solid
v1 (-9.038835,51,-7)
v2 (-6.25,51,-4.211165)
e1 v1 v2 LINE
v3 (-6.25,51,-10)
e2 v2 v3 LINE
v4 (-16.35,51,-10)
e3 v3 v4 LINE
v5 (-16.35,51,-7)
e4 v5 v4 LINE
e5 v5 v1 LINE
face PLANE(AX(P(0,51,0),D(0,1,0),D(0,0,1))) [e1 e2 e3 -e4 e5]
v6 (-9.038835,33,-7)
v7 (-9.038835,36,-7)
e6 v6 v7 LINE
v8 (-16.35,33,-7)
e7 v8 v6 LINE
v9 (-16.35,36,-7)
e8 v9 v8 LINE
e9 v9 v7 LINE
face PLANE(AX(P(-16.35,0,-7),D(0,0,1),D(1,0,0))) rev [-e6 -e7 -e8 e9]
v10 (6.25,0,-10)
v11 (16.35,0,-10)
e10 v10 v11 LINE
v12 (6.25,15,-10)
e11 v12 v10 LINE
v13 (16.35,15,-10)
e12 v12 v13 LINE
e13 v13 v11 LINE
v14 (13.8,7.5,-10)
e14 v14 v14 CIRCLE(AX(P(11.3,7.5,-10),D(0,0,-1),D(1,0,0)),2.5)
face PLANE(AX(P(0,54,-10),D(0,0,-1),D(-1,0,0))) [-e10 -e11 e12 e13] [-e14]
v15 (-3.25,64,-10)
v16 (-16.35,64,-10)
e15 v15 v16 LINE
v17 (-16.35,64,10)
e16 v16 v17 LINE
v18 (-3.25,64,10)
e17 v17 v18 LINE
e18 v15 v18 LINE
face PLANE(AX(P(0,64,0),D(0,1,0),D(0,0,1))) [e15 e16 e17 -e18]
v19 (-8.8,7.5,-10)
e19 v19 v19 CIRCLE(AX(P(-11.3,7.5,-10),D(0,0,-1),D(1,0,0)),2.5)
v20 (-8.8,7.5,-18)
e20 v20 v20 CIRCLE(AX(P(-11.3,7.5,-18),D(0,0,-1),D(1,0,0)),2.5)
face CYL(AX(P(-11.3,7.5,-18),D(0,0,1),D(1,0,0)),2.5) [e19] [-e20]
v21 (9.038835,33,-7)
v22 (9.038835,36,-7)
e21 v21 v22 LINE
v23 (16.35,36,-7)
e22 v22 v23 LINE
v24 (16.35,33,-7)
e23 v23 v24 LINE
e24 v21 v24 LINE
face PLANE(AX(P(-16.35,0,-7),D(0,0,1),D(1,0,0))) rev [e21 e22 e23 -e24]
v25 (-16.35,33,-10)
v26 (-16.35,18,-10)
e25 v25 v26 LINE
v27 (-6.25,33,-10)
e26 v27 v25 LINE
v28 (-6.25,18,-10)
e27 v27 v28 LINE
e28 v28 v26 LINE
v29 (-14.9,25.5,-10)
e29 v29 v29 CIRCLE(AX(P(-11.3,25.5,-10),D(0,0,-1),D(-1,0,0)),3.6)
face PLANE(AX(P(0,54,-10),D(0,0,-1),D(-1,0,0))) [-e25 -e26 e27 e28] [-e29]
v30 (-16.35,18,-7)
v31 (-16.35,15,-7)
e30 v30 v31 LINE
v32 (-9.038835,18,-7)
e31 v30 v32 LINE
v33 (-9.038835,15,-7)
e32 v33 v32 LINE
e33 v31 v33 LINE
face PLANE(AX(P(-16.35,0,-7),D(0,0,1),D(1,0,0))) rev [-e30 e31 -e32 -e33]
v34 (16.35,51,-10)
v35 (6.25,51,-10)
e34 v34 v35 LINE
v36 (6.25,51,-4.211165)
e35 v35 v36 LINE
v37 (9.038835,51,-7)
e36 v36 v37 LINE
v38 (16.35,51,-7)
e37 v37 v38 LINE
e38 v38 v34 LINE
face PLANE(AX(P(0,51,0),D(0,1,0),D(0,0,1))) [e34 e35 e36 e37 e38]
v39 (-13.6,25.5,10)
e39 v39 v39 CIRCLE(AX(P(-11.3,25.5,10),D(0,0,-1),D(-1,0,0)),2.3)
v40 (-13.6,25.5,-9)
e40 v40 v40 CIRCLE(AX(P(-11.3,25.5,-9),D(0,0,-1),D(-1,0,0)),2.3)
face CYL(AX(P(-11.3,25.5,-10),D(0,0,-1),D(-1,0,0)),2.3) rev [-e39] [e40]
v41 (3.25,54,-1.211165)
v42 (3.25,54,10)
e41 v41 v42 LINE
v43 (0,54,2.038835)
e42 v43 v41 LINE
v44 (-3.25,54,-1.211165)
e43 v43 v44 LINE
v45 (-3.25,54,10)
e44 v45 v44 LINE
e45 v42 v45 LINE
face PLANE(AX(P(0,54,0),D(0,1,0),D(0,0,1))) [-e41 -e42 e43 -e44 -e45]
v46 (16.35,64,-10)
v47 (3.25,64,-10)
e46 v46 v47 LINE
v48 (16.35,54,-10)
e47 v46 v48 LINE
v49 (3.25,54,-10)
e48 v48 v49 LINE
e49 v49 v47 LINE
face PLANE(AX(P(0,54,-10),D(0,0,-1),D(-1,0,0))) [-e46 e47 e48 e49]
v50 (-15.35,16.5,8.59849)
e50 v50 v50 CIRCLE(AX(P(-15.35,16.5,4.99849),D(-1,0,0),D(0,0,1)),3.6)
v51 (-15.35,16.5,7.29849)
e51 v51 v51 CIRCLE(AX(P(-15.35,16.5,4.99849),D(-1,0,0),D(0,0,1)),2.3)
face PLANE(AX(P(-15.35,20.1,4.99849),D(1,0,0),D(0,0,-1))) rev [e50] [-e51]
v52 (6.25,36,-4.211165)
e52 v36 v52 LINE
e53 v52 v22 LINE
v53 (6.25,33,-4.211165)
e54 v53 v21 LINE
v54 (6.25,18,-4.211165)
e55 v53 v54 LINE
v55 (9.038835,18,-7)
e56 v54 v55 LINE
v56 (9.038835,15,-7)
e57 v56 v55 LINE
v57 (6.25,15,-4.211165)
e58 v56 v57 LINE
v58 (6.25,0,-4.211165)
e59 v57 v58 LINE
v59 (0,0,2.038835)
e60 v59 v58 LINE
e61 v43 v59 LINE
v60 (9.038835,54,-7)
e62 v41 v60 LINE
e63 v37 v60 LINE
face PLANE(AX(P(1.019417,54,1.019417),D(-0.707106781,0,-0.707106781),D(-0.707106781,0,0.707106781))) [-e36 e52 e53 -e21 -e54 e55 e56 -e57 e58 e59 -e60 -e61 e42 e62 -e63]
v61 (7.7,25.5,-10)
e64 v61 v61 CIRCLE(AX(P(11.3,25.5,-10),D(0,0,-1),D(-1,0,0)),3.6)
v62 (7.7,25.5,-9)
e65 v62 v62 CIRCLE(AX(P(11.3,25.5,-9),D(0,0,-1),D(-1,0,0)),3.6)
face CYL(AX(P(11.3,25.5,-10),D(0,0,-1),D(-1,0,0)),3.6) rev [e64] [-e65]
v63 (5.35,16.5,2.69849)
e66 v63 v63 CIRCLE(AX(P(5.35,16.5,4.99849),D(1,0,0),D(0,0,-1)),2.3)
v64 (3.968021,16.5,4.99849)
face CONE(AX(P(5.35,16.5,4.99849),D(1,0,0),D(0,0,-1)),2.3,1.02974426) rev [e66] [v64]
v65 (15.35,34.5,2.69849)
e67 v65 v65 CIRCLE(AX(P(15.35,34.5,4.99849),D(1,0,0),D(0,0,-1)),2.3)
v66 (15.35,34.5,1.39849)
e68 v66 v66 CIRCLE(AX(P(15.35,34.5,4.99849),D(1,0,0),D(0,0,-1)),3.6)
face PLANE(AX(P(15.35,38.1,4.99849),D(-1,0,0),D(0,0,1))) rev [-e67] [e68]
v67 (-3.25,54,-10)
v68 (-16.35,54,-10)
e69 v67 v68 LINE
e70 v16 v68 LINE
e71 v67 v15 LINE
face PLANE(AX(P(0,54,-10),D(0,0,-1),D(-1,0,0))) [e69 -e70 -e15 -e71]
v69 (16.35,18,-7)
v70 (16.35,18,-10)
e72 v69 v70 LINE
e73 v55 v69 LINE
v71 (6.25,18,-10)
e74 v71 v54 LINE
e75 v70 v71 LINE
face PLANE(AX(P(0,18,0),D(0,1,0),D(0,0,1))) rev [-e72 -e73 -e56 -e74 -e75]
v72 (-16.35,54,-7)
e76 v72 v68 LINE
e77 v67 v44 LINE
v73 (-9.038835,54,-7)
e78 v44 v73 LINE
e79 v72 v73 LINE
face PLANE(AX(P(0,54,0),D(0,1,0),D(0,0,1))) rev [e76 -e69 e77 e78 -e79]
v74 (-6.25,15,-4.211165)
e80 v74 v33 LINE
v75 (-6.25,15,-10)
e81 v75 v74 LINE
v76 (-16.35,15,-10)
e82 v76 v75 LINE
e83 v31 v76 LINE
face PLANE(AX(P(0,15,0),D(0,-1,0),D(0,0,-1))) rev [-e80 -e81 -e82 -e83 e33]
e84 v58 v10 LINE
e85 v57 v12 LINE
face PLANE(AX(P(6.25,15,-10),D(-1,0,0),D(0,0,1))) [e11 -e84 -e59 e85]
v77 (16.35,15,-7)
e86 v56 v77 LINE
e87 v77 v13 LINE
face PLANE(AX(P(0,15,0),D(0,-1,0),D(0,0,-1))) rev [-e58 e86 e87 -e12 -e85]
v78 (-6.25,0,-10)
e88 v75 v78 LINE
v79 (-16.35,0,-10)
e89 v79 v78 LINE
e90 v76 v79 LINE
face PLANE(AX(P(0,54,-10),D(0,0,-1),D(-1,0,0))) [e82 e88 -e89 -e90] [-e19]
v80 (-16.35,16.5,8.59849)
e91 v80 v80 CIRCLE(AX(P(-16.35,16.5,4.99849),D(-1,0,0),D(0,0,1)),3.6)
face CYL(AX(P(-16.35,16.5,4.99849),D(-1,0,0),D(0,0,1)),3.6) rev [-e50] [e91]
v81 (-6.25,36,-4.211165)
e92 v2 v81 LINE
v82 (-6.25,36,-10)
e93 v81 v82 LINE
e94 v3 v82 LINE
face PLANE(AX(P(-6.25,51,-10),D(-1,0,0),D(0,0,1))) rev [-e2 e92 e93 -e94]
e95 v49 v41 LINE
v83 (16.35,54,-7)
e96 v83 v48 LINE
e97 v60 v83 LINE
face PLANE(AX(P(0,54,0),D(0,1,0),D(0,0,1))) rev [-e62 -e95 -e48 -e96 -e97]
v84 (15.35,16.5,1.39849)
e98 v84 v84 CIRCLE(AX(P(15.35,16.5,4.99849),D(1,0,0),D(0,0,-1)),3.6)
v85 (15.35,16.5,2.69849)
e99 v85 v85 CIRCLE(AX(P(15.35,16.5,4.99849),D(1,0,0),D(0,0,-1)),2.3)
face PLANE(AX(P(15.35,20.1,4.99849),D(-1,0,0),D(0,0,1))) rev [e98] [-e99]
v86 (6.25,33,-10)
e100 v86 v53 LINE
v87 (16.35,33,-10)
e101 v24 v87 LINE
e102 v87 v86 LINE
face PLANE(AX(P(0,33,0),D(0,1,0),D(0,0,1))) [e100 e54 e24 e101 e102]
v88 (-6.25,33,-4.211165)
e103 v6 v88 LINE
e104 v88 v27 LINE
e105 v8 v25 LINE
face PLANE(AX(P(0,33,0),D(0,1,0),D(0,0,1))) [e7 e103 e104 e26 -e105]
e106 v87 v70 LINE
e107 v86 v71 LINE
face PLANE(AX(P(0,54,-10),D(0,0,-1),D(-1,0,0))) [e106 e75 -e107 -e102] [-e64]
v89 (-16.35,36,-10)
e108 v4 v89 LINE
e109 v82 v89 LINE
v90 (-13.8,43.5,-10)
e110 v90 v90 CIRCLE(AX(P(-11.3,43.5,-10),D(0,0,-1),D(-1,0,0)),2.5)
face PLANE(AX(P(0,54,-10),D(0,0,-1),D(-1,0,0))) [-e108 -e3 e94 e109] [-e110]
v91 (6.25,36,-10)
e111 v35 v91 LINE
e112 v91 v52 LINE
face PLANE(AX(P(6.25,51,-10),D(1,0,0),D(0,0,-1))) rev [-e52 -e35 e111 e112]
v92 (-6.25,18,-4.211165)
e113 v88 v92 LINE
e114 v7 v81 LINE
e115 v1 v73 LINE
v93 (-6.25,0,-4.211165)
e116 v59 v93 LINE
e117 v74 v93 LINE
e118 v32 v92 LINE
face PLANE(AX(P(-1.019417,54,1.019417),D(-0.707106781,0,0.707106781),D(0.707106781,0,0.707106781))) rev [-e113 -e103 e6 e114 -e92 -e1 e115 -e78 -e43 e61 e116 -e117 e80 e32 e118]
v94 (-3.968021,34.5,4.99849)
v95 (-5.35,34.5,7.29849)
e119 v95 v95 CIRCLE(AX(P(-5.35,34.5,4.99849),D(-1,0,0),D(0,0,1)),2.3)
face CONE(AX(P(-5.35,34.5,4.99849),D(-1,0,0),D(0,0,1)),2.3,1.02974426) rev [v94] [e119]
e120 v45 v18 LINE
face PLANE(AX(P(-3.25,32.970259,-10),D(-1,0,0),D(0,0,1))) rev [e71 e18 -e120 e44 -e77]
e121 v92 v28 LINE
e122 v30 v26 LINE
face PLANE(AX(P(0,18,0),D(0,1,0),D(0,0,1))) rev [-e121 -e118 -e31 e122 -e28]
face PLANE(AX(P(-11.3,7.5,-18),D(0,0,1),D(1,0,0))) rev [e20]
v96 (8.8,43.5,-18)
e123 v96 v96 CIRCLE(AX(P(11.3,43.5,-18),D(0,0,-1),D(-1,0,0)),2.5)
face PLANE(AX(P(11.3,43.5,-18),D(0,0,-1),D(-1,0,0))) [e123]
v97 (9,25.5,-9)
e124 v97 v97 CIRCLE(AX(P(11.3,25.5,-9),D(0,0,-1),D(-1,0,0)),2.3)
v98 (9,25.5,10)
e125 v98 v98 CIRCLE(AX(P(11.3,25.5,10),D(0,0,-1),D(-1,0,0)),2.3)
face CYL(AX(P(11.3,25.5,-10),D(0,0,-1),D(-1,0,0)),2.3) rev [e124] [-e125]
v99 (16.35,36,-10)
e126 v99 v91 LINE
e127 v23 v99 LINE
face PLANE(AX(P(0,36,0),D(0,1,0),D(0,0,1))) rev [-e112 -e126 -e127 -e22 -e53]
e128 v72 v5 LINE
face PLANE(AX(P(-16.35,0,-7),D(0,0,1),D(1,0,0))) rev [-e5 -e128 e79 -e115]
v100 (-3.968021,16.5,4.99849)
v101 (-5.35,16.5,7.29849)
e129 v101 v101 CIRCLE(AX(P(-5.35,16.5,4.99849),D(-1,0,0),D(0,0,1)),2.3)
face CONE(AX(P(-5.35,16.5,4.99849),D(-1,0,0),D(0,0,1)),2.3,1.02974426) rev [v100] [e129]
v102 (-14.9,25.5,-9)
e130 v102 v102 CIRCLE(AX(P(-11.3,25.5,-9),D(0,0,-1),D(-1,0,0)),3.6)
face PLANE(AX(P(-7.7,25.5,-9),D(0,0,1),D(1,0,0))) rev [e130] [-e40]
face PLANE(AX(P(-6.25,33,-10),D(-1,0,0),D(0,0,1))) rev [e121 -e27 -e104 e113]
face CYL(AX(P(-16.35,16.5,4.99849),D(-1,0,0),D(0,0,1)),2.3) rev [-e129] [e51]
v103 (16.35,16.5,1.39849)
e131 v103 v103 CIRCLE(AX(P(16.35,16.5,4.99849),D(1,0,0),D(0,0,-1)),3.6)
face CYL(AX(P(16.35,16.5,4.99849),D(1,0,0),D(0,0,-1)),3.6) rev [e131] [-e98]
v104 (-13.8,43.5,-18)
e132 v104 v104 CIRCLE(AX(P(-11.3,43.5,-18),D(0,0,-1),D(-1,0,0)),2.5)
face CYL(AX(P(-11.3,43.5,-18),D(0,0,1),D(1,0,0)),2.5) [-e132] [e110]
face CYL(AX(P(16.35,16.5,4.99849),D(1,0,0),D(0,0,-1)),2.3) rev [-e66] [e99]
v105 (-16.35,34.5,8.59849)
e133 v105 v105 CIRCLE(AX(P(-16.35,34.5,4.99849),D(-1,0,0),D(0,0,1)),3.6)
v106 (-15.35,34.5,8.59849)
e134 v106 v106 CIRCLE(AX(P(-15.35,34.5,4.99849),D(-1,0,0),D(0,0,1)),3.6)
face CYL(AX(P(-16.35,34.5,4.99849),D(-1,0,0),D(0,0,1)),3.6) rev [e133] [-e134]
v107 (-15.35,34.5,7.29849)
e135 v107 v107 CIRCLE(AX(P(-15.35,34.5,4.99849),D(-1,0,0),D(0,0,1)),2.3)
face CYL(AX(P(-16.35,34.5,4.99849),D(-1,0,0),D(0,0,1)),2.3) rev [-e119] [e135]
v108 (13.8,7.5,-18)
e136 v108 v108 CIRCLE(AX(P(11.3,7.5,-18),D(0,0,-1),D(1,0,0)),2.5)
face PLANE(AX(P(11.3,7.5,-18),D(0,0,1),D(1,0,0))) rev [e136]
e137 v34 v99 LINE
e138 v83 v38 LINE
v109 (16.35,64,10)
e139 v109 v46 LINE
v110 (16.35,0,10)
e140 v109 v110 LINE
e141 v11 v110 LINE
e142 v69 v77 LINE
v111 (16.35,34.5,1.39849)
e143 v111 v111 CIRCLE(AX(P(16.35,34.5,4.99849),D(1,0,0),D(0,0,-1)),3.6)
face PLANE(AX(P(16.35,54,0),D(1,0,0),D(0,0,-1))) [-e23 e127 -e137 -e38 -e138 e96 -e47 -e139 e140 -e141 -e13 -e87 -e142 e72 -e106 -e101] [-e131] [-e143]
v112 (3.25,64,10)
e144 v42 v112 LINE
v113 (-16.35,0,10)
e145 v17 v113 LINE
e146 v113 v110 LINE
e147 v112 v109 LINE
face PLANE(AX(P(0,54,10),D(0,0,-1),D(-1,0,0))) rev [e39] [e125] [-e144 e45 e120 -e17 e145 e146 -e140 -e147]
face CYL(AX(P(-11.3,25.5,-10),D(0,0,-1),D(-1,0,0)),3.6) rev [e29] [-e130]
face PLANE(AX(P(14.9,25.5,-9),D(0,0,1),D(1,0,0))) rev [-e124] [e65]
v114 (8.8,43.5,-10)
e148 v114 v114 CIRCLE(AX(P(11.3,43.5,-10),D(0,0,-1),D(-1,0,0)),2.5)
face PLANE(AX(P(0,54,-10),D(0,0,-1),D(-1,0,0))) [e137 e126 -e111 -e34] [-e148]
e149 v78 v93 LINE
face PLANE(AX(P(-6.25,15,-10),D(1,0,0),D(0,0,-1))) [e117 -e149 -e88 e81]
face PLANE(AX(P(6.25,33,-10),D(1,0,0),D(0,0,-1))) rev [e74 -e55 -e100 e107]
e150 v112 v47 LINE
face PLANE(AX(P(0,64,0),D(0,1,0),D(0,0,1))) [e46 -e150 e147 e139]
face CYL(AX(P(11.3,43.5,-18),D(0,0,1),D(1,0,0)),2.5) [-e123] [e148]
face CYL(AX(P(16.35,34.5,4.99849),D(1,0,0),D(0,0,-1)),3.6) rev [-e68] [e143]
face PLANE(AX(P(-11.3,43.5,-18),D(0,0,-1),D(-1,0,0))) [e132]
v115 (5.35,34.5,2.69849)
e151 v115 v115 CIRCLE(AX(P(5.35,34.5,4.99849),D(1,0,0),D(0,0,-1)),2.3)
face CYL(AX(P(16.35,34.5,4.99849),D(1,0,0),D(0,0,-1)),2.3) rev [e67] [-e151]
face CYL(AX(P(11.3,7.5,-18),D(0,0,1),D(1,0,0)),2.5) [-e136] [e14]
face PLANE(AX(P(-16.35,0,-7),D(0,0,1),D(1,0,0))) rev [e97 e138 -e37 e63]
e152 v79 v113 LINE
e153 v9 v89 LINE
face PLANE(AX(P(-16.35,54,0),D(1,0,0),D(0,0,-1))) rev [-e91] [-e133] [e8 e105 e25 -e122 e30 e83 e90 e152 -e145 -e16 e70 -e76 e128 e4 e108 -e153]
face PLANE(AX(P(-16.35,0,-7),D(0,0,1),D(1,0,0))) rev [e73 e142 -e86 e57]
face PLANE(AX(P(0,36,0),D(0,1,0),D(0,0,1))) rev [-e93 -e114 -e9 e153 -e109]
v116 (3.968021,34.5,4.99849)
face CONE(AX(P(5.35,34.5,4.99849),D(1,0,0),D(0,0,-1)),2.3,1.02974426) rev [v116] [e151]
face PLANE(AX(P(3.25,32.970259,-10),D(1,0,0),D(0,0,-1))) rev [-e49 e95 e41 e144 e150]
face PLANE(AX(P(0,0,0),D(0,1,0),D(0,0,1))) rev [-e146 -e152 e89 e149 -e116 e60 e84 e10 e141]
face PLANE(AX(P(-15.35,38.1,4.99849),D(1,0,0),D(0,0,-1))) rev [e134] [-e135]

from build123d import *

# Parameters (mm, degrees)
EXTRUDE_1_DEPTH        = 54
EXTRUDE_2_DEPTH        = 10
SKETCH_3_W             = 6.5
SKETCH_3_H             = 20
CUT_EXTRUDE_1_DEPTH    = 10
EXTRUDE_3_DEPTH        = 15
EXTRUDE_4_DEPTH        = 15
PATTERN_LINEAR_6_COUNT = 2
PATTERN_LINEAR_6_PITCH = 18
SKETCH_8_W             = 3
SKETCH_8_H             = 3
CUT_EXTRUDE_2_DEPTH    = 73.562318045
SKETCH_9_R             = 2.5
EXTRUDE_5_DEPTH        = 8
OTHER_START            = -10
OTHER_1_OUTLINE_R      = 2.3
OTHER_1_DEPTH          = 20
OTHER_1_2_OUTLINE_R    = 3.6
OTHER_1_2_OUTLINE_R_2  = 2.3
OTHER_1_2_DEPTH        = 1


# Read off the part's stored shape, not the designer's step: 高级异型孔1, 高级异型孔2
with BuildPart() as part:
    # 草图1 → 凸台-拉伸1 (new body)
    with BuildSketch(Plane(origin=(0, 0, 0), x_dir=(1, 0, 0), z_dir=(0, 1, 0))):
        Polygon((-12.038834765, 10), (-16.35, 10), (-16.35, -10), (16.35, -10), (16.35, 10), (12.038834765, 10), (0, -2.038834765), align=None)
    extrude(amount=EXTRUDE_1_DEPTH)

    # 草图2 → 凸台-拉伸2 (add)
    with BuildSketch(Plane(origin=(0, 54, 0), x_dir=(1, 0, 0), z_dir=(0, 1, 0))):
        Polygon((16.35, 10), (12.038834765, 10), (0, -2.038834765), (-12.038834765, 10), (-16.35, 10), (-16.35, -10), (16.35, -10), align=None)
        Polygon((12.038834765, 10), (-12.038834765, 10), (0, -2.038834765), align=None)
    extrude(amount=EXTRUDE_2_DEPTH)

    # 草图3 → 切除-拉伸1 (cut)
    with BuildSketch(Plane(origin=(0, 64, 0), x_dir=(1, 0, 0), z_dir=(0, 1, 0))):
        Rectangle(SKETCH_3_W, SKETCH_3_H)
    extrude(amount=-CUT_EXTRUDE_1_DEPTH, mode=Mode.SUBTRACT)

    # 草图5 → 凸台-拉伸3 (add)
    with BuildSketch(Plane(origin=(0, 0, 0), x_dir=(-1, 0, 0), z_dir=(0, -1, 0))):
        Polygon((6.25, 4.211165235), (12.038834765, 10), (6.25, 10), align=None)
        Polygon((-6.25, 4.211165235), (-12.038834765, 10), (-6.25, 10), align=None)
    extrude(amount=-EXTRUDE_3_DEPTH)

    # 草图6 → 凸台-拉伸4 (add)
    with BuildSketch(Plane(origin=(0, 18, 0), x_dir=(1, 0, 0), z_dir=(0, 1, 0))):
        Polygon((12.038834765, 10), (6.25, 10), (6.25, 4.211165235), align=None)
        Polygon((-6.25, 4.211165235), (-12.038834765, 10), (-6.25, 10), align=None)
    extrude_4 = extrude(amount=EXTRUDE_4_DEPTH)

    # 阵列(线性)6: 凸台-拉伸4 ×2
    with Locations(*[(0, i * PATTERN_LINEAR_6_PITCH, 0) for i in range(1, PATTERN_LINEAR_6_COUNT)]):
        add(extrude_4)

    # 草图8 → 切除-拉伸2 (cut, through all)
    with BuildSketch(Plane(origin=(16.35, 0, 0), x_dir=(0, 0, -1), z_dir=(1, 0, 0))):
        with Locations((8.5, 52.5)):
            Rectangle(SKETCH_8_W, SKETCH_8_H)
        with Locations((8.5, 34.5)):
            Rectangle(SKETCH_8_W, SKETCH_8_H)
        with Locations((8.5, 16.5)):
            Rectangle(SKETCH_8_W, SKETCH_8_H)
    extrude(amount=-CUT_EXTRUDE_2_DEPTH, mode=Mode.SUBTRACT)

    # 草图9 → 凸台-拉伸5 (add)
    with BuildSketch(Plane(origin=(0, 0, -10), x_dir=(-1, 0, 0), z_dir=(0, 0, -1))):
        with Locations((-11.3, 43.5)):
            Circle(SKETCH_9_R)
        with Locations((11.3, 43.5)):
            Circle(SKETCH_9_R)
        with Locations(Location((11.3, 7.5, 0), (0, 0, 180))):
            Circle(SKETCH_9_R)
        with Locations(Location((-11.3, 7.5, 0), (0, 0, 180))):
            Circle(SKETCH_9_R)
    extrude(amount=EXTRUDE_5_DEPTH)

    # 高级异型孔1 outline → 高级异型孔1 (cut)
    with BuildSketch(Plane.XY.offset(OTHER_START)):
        with Locations((-11.3, 25.5)):
            Circle(OTHER_1_OUTLINE_R)
        with Locations((11.3, 25.5)):
            Circle(OTHER_1_OUTLINE_R)
    extrude(amount=OTHER_1_DEPTH, mode=Mode.SUBTRACT)

    # Other 1 2 outline → Other 1 2 (cut)
    # profile 1 of 2: a face of its own
    with BuildSketch(Plane.XY.offset(OTHER_START)):
        with Locations((-11.3, 25.5)):
            Circle(OTHER_1_2_OUTLINE_R)
        with Locations((-11.3, 25.5)):
            Circle(OTHER_1_2_OUTLINE_R_2, mode=Mode.SUBTRACT)
    # profile 2 of 2: a face of its own
    with BuildSketch(Plane.XY.offset(OTHER_START)):
        with Locations((11.3, 25.5)):
            Circle(OTHER_1_2_OUTLINE_R)
        with Locations((11.3, 25.5)):
            Circle(OTHER_1_2_OUTLINE_R_2, mode=Mode.SUBTRACT)
    extrude(amount=OTHER_1_2_DEPTH, mode=Mode.SUBTRACT)

    # 高级异型孔2 outline → 高级异型孔2 (revolve, cut)
    with BuildSketch(Plane(origin=(0, 34.5, 4.998489893), x_dir=(0, 1, 0), z_dir=(0, 0, -1))):
        Polygon((3.6, -16.35), (3.6, -15.35), (2.3, -15.35), (2.3, -5.35), (0, -3.96802058), (0, -16.35), align=None)
    other_2 = revolve(axis=Axis((0, 34.5, 4.998489893), (1, 0, 0)), mode=Mode.SUBTRACT)

    # Other 2 2 outline → Other 2 2 (revolve, cut)
    with BuildSketch(Plane(origin=(0, 16.5, 4.998489893), x_dir=(0, 1, 0), z_dir=(0, 0, -1))):
        Polygon((0, -16.35), (3.6, -16.35), (3.6, -15.35), (2.3, -15.35), (2.3, -5.35), (0, -3.96802058), align=None)
    other_2_2 = revolve(axis=Axis((0, 16.5, 4.998489893), (1, 0, 0)), mode=Mode.SUBTRACT)

    # 镜向1: 高级异型孔2, Other 2 2 across plane
    add(other_2.mirror(Plane(origin=(0, 0, 0), x_dir=(0, 0, 1), z_dir=(1, 0, 0))), mode=Mode.SUBTRACT)
    add(other_2_2.mirror(Plane(origin=(0, 0, 0), x_dir=(0, 0, 1), z_dir=(1, 0, 0))), mode=Mode.SUBTRACT)


solid = part.part
